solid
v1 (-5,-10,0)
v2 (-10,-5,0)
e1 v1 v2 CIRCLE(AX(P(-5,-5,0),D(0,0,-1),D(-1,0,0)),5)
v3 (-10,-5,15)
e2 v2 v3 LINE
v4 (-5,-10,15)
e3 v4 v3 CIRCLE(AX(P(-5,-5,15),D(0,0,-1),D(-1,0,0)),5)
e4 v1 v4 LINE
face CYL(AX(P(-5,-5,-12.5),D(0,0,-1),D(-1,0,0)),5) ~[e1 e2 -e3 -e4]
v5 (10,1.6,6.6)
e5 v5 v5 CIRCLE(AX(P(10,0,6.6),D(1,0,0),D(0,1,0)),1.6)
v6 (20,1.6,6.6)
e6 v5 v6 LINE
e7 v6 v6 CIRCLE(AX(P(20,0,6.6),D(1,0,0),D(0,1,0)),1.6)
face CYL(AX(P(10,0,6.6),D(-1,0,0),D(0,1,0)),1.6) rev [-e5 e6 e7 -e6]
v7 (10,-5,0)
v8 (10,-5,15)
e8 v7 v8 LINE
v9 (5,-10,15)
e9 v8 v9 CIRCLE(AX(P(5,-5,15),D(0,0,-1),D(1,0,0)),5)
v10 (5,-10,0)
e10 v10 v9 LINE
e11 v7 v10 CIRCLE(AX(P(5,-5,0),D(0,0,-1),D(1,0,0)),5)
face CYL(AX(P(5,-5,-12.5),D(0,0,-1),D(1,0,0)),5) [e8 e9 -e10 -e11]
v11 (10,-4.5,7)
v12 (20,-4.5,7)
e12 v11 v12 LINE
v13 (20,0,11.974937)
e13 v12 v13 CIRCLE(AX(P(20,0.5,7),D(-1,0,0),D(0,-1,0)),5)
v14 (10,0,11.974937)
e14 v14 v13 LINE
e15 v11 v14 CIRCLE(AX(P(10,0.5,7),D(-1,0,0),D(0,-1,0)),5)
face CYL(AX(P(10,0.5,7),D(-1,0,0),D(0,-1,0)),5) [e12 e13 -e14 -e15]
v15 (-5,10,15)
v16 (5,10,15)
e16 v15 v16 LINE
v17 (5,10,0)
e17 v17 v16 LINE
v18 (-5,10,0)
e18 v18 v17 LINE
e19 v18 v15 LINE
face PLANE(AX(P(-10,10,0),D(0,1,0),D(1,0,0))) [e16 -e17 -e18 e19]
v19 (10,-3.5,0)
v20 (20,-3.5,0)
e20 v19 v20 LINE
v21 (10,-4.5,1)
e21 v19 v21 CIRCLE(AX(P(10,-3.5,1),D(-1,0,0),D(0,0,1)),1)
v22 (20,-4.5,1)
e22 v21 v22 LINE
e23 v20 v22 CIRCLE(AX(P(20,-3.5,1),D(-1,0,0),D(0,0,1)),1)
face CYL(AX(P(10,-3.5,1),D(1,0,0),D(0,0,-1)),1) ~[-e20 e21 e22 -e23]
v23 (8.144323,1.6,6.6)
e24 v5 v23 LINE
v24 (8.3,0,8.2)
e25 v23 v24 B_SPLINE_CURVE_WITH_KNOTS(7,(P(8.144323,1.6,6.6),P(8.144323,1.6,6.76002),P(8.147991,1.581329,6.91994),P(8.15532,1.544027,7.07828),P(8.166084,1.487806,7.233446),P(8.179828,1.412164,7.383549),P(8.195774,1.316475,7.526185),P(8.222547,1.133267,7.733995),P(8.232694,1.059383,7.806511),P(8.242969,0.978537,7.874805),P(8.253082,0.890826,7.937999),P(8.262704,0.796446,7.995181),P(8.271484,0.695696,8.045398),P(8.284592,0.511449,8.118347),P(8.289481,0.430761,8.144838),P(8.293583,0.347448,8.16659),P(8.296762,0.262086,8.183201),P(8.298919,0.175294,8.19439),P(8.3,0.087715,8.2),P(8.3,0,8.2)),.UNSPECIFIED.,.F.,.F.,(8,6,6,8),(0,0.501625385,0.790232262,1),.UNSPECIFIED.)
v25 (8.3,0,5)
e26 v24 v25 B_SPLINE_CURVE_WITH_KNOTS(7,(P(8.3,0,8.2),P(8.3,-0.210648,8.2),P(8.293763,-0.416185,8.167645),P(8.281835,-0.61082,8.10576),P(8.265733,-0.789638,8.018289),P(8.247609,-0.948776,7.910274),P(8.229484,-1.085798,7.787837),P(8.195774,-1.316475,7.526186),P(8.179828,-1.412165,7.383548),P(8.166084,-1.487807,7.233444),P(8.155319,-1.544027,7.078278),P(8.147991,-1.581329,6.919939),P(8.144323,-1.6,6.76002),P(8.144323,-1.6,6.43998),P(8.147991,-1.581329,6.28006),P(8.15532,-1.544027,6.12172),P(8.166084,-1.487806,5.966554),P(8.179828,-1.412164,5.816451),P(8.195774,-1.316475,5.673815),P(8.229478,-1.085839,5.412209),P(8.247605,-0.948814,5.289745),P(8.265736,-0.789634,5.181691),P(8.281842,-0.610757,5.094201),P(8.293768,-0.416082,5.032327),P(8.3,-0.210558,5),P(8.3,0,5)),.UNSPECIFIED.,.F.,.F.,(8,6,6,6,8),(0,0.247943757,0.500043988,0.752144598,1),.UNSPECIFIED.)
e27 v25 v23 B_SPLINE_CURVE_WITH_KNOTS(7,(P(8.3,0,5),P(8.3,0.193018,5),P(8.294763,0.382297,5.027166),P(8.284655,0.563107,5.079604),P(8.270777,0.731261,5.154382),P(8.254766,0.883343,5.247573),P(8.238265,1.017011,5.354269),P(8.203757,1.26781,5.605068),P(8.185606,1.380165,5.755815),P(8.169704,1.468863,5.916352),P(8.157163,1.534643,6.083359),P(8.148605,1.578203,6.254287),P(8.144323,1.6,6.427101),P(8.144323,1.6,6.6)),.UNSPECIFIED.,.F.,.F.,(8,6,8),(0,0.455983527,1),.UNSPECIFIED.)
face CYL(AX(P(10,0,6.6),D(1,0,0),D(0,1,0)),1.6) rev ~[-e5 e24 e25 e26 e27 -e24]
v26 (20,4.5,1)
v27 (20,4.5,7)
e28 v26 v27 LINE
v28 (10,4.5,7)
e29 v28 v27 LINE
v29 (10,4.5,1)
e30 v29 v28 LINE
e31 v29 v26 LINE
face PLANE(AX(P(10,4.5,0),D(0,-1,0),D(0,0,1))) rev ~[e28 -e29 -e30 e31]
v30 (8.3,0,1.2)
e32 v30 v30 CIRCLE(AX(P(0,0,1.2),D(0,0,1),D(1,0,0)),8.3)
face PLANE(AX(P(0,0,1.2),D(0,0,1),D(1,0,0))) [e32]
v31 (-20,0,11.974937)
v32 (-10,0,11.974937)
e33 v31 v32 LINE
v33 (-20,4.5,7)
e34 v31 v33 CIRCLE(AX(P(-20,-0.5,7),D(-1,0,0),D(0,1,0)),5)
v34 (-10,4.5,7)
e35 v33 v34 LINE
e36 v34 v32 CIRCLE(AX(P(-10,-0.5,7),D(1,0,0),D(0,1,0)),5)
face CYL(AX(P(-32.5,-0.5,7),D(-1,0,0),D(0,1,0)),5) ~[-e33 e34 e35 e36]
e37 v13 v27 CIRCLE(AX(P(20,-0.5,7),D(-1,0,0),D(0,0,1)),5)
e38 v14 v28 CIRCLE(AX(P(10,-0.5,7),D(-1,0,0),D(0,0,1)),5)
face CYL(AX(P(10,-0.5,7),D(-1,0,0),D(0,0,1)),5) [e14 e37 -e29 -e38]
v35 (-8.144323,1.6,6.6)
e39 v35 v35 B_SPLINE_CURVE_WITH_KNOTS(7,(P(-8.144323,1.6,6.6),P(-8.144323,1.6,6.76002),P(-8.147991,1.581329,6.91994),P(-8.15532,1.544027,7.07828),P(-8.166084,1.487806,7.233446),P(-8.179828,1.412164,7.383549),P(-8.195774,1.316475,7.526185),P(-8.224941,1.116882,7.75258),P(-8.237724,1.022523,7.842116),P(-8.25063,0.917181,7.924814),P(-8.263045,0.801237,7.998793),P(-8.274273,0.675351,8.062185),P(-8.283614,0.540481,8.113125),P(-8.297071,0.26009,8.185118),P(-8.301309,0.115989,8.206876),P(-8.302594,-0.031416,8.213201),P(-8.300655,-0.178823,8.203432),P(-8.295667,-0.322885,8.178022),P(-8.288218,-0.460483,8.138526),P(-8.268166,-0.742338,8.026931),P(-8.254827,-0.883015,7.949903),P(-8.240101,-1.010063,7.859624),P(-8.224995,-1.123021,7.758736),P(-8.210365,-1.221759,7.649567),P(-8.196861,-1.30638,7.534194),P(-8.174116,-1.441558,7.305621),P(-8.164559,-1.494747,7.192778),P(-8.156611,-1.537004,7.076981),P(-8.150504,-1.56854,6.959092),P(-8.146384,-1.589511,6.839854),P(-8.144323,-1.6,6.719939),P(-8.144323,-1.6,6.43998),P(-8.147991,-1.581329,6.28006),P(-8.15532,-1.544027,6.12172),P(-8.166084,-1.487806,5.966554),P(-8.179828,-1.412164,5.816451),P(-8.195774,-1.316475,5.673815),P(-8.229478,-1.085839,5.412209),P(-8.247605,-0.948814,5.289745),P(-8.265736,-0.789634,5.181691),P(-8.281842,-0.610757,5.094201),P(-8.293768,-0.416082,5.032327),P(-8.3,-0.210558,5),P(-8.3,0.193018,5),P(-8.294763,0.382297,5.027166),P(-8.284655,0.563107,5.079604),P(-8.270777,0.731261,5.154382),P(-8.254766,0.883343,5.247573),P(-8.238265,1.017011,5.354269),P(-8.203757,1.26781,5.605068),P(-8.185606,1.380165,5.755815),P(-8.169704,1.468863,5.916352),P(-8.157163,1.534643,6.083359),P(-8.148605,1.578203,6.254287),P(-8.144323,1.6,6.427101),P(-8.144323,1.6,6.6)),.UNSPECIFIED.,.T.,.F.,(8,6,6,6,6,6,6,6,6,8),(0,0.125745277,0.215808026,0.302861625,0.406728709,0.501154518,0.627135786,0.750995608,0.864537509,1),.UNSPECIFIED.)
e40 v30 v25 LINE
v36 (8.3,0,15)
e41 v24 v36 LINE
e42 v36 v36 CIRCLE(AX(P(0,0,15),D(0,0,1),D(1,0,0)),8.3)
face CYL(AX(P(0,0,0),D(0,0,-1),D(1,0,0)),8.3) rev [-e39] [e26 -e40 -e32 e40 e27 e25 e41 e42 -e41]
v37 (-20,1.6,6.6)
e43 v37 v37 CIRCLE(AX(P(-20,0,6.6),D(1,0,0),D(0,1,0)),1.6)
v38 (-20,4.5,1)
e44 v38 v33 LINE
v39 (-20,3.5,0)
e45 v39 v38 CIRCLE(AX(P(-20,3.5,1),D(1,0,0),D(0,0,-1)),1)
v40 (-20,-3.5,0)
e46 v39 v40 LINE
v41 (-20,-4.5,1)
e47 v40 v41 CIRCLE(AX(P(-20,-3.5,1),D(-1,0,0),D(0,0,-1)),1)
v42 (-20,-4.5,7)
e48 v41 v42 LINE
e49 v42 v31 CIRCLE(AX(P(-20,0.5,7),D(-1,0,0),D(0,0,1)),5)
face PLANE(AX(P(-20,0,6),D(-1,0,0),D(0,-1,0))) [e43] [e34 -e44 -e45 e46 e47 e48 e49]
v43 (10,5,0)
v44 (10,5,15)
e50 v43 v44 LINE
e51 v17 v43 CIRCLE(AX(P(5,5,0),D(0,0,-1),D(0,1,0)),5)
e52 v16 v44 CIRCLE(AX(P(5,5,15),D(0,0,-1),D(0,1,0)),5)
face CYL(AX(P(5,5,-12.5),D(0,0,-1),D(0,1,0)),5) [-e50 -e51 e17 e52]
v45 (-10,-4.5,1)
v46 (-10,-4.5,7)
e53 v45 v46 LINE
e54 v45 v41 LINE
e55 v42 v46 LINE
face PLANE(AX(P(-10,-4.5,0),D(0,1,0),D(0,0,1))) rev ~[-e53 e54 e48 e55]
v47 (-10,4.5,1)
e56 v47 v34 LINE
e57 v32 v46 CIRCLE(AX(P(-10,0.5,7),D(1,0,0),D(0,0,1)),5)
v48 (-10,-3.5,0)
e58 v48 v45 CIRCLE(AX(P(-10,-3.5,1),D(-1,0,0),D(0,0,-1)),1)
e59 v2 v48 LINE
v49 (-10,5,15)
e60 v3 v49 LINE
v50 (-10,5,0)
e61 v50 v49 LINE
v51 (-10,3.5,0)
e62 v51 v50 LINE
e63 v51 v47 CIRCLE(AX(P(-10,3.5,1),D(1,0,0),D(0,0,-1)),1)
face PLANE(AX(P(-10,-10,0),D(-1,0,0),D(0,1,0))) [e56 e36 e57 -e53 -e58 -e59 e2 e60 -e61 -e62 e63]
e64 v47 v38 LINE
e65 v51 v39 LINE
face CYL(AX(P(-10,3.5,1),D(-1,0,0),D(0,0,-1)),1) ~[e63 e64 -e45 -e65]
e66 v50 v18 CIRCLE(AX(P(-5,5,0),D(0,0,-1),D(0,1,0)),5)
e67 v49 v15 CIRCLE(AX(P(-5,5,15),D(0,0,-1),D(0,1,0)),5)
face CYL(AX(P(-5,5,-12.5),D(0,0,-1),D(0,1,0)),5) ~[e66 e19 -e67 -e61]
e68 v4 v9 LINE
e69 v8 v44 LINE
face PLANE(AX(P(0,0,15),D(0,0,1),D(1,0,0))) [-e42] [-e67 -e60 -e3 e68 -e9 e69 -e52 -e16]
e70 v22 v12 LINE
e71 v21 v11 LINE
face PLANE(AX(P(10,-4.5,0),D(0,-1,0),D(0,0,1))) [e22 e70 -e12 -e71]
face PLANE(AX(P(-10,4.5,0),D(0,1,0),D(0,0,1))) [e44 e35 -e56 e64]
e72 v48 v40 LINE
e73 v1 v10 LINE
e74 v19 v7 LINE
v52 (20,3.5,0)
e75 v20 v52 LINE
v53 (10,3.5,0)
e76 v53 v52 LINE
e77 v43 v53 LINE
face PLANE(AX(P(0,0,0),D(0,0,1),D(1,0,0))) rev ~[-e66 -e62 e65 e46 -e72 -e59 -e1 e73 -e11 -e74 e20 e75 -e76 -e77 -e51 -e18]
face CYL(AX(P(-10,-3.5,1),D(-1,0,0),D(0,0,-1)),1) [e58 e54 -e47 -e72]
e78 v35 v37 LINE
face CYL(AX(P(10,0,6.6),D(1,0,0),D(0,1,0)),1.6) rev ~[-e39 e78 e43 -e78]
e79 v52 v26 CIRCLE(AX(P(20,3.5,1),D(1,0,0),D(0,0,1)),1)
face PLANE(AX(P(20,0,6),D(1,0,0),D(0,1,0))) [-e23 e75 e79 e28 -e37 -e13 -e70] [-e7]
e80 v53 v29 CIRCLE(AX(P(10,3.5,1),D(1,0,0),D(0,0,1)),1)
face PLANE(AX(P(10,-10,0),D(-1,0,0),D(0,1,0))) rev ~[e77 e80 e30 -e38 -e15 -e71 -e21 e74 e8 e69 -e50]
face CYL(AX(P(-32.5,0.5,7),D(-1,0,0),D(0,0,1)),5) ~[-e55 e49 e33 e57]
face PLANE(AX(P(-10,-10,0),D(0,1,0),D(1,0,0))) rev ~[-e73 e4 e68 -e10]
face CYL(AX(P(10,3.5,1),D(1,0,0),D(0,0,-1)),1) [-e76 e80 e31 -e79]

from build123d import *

# Parameters (mm, degrees)
F0_W        = 20
F0_H        = 20
F0_R        = 8.3
F1_DEPTH    = 15
F2_W        = 9
F2_H        = 12
F3_DEPTH    = 10
F4_W        = 9
F4_H        = 12
F4_R        = 1.6
F5_DEPTH    = 10
F6_DEPTH    = 30.001
F7_DEPTH    = 1.2
F8_T1_DEPTH = 40
F8_T3_DEPTH = 22.5
F8_T5_DEPTH = 22.5
F9_R        = 1


# Not quite as in the source:
# - a fillet or chamfer that OpenCascade refuses, or shapes differently, is made with other operations: its cross-section is extruded or revolved along the edge and cut away or added


with BuildPart() as f1:
    # F0 (on Top) → F1 (new body)
    with BuildSketch(Plane.XY):
        Rectangle(F0_W, F0_H)
        Circle(F0_R, mode=Mode.SUBTRACT)
    extrude(amount=F1_DEPTH)

    # F2 (on face) → F3 (join)
    with BuildSketch(Plane(origin=(-10, 0, 0), x_dir=(0, -1, 0), z_dir=(-1, 0, 0))):
        with Locations((0, 6)):
            Rectangle(F2_W, F2_H)
    extrude(amount=F3_DEPTH)

    # F4 (on face) → F5 (join)
    with BuildSketch(Plane.YZ.offset(10)):
        with Locations((0, 6)):
            Rectangle(F4_W, F4_H)
        with Locations((0, 6.6)):
            Circle(F4_R, mode=Mode.SUBTRACT)
    extrude(amount=F5_DEPTH)

    # F4 (on face) → F6 (cut, through all)
    with BuildSketch(Plane.YZ.offset(10)):
        with Locations((0, 6.6)):
            Circle(F4_R)
    extrude(amount=-F6_DEPTH, mode=Mode.SUBTRACT)

    # F0 (on Top) → F7 (join)
    with BuildSketch(Plane.XY):
        Circle(F0_R)
    extrude(amount=F7_DEPTH)

    # F8: fillet of radius 5 on 8 edges, made by hand

    # F8_s2 → F8_t1 (cut)
    with BuildSketch(Plane.XY.offset(-12.5)):
        with BuildLine():
            ThreePointArc((-10, -5), (-8.5355339059, -8.5355339059), (-5, -10))
            Line((-5, -10), (-10, -10))
            Line((-10, -10), (-10, -5))
        make_face()
        with BuildLine():
            ThreePointArc((10, -5), (8.5355339059, -8.5355339059), (5, -10))
            Line((5, -10), (10, -10))
            Line((10, -10), (10, -5))
        make_face()
        with BuildLine():
            ThreePointArc((-5, 10), (-8.5355339059, 8.5355339059), (-10, 5))
            Line((-10, 5), (-10, 10))
            Line((-10, 10), (-5, 10))
        make_face()
        with BuildLine():
            ThreePointArc((5, 10), (8.5355339059, 8.5355339059), (10, 5))
            Line((10, 5), (10, 10))
            Line((10, 10), (5, 10))
        make_face()
    extrude(amount=F8_T1_DEPTH, mode=Mode.SUBTRACT)

    # F8_s4 → F8_t3 (cut)
    with BuildSketch(Plane.YZ.offset(-32.5)):
        with BuildLine():
            ThreePointArc((4.5, 7), (3.0355339059, 10.5355339059), (-0.5, 12))
            Line((-0.5, 12), (4.5, 12))
            Line((4.5, 12), (4.5, 7))
        make_face()
        with BuildLine():
            ThreePointArc((0.5, 12), (-3.0355339059, 10.5355339059), (-4.5, 7))
            Line((-4.5, 7), (-4.5, 12))
            Line((-4.5, 12), (0.5, 12))
        make_face()
    extrude(amount=F8_T3_DEPTH, mode=Mode.SUBTRACT)

    # F8_s6 → F8_t5 (cut)
    with BuildSketch(Plane.YZ.offset(10)):
        with BuildLine():
            ThreePointArc((-0.5, 12), (3.0355339059, 10.5355339059), (4.5, 7))
            Line((4.5, 7), (4.5, 12))
            Line((4.5, 12), (-0.5, 12))
        make_face()
        with BuildLine():
            ThreePointArc((-4.5, 7), (-3.0355339059, 10.5355339059), (0.5, 12))
            Line((0.5, 12), (-4.5, 12))
            Line((-4.5, 12), (-4.5, 7))
        make_face()
    extrude(amount=F8_T5_DEPTH, mode=Mode.SUBTRACT)

    # F9
    f9_edges = [f1.edges().sort_by_distance(p)[0] for p in [
        (15, -4.5, 0),
        (15, 4.5, 0),
        (-15, 4.5, 0),
        (-15, -4.5, 0),
    ]]
    fillet(f9_edges, radius=F9_R)


solid = f1.part
